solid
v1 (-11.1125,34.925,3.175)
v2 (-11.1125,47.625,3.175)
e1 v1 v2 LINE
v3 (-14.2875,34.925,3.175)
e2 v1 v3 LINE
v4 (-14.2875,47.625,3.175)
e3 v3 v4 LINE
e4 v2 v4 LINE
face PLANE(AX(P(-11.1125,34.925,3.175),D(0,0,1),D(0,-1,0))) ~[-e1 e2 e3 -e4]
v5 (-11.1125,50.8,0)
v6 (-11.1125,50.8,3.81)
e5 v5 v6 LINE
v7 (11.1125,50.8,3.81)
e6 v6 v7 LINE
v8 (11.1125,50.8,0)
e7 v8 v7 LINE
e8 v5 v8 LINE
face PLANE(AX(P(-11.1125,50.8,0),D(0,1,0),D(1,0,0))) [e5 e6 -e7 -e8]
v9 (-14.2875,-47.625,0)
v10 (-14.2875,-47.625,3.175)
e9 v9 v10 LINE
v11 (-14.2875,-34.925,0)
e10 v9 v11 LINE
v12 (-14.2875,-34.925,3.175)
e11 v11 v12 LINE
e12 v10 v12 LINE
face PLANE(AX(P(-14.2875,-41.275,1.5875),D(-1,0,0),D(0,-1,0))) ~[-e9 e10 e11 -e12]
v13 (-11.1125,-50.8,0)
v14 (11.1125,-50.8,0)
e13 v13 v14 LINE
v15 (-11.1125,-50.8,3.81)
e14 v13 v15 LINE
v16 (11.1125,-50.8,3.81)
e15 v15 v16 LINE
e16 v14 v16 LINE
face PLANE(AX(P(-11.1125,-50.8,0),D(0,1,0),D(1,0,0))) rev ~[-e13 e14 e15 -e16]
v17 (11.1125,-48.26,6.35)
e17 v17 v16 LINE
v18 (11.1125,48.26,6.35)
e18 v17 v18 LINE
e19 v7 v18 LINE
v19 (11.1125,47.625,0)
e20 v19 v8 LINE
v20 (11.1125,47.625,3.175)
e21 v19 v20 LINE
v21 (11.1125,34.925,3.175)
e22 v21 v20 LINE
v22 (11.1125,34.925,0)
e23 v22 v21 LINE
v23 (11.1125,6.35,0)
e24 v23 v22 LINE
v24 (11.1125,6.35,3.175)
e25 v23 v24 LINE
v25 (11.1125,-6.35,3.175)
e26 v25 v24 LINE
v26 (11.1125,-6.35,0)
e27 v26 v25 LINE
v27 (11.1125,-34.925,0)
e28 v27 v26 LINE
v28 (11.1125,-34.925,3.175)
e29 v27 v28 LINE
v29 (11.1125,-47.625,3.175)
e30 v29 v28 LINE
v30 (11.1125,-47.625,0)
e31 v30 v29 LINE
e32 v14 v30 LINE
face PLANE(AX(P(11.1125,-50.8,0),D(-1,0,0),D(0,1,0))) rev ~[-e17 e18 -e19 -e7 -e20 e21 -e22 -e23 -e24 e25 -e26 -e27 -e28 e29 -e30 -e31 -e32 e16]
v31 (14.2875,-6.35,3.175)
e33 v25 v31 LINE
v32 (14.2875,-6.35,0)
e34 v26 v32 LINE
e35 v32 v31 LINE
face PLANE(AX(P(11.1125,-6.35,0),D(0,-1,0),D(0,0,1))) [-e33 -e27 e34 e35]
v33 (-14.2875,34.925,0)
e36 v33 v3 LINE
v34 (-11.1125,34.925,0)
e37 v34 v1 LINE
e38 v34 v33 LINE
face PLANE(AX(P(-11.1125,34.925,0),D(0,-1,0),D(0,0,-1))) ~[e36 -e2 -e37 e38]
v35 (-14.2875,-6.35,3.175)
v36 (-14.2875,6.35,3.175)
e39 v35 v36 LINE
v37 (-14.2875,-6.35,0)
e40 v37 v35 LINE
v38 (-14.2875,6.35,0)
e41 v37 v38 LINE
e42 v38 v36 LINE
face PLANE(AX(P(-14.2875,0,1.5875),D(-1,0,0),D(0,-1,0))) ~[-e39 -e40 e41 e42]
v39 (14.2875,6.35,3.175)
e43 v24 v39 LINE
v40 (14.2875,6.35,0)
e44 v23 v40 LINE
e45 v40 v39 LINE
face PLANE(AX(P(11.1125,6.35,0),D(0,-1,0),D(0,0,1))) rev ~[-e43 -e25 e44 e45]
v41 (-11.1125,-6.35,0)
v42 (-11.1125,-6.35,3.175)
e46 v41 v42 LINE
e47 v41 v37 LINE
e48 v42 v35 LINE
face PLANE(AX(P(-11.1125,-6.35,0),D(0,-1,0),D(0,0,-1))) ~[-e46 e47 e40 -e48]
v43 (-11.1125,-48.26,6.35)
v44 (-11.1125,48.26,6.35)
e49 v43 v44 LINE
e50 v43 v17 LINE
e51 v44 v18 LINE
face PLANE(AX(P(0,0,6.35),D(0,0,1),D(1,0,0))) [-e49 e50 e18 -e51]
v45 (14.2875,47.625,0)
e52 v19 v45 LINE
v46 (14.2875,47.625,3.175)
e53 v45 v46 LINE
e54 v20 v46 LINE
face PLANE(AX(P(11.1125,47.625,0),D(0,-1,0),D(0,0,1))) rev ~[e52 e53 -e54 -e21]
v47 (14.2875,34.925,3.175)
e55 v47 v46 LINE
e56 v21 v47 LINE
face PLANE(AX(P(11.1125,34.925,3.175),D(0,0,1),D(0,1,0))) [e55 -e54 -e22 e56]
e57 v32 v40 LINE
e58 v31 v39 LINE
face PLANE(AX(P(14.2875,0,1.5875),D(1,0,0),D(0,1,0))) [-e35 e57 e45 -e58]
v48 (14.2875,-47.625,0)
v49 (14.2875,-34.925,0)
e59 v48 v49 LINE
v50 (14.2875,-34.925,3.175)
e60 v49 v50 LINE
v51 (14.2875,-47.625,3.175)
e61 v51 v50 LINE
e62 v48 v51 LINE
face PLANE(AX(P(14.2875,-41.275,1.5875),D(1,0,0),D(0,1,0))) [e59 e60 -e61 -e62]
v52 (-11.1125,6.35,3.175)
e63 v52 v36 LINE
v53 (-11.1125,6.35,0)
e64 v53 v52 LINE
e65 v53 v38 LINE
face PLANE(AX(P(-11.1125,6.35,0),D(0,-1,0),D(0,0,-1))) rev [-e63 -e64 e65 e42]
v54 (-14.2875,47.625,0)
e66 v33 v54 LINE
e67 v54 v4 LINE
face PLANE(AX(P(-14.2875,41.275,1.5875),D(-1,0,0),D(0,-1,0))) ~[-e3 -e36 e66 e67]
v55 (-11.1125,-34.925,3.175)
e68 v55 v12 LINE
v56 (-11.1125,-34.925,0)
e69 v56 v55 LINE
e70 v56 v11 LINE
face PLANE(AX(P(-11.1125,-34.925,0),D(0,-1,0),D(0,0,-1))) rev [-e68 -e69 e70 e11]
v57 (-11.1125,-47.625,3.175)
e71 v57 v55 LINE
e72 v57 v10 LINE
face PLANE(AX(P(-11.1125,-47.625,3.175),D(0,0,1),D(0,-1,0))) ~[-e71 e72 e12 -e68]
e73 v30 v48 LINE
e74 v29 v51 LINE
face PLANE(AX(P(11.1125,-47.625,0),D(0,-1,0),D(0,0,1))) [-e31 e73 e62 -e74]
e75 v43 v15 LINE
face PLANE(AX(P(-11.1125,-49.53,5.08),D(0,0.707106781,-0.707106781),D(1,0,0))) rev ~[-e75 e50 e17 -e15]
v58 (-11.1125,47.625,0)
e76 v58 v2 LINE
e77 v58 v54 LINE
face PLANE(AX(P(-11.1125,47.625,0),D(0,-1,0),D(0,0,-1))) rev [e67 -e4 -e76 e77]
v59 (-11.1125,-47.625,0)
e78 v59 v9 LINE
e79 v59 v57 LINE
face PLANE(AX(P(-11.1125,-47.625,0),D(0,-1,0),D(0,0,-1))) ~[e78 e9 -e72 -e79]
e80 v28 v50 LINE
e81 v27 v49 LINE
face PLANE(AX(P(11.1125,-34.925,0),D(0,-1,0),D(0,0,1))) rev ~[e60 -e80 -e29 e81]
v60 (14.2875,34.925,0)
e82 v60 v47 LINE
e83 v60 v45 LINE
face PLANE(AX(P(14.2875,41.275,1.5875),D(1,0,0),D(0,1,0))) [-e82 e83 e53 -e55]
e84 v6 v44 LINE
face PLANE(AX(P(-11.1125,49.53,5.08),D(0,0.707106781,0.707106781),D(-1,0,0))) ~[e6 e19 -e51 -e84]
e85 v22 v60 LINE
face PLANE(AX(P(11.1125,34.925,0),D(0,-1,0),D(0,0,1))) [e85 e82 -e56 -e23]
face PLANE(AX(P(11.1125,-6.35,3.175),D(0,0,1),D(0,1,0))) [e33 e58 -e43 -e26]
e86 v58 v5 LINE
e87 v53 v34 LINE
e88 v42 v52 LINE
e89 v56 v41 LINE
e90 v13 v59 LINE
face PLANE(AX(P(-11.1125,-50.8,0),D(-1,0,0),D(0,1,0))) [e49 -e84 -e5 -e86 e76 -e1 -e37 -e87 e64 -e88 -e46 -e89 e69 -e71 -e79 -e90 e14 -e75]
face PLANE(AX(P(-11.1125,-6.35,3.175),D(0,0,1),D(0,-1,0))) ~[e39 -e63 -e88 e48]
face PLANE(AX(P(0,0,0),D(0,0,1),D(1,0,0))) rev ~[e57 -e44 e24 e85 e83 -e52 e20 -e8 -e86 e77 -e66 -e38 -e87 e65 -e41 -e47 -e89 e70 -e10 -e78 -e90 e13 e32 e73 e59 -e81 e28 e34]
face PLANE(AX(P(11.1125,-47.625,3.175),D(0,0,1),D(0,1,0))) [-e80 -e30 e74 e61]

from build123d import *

# Parameters (mm, degrees)
F0_W     = 22.225
F0_H     = 101.6
F1_DEPTH = 6.35
F2_W     = 12.7
F2_H     = 3.175
F3_DEPTH = 3.175
F4_SIZE  = 2.54


# Not quite as in the source:
# - a pattern or mirror of a feature is missing from the dataset's text; its kind, count and spacing are read off the source's solid


with BuildPart() as f1:
    # F0 (on Top) → F1 (new body)
    with BuildSketch(Plane.XY):
        Rectangle(F0_W, F0_H)
    extrude(amount=F1_DEPTH)

    # F2 (on face) → F3 (join)
    with BuildSketch(Plane.YZ.offset(11.1125)):
        with Locations((-41.275, 1.5875)):
            Rectangle(F2_W, F2_H)
        with Locations((0, 1.5875)):
            Rectangle(F2_W, F2_H)
        with Locations((41.275, 1.5875)):
            Rectangle(F2_W, F2_H)
    f3 = extrude(amount=F3_DEPTH)

    # F3_copies: F3 across plane
    add(f3.mirror(Plane(origin=(0, 0, 0), x_dir=(0, 0, -1), z_dir=(-1, 0, 0))))

    # F4
    f4_edges = [f1.edges().sort_by_distance(p)[0] for p in [
        (0, 50.8, 6.35),
        (0, -50.8, 6.35),
    ]]
    chamfer(f4_edges, length=F4_SIZE)


solid = f1.part
